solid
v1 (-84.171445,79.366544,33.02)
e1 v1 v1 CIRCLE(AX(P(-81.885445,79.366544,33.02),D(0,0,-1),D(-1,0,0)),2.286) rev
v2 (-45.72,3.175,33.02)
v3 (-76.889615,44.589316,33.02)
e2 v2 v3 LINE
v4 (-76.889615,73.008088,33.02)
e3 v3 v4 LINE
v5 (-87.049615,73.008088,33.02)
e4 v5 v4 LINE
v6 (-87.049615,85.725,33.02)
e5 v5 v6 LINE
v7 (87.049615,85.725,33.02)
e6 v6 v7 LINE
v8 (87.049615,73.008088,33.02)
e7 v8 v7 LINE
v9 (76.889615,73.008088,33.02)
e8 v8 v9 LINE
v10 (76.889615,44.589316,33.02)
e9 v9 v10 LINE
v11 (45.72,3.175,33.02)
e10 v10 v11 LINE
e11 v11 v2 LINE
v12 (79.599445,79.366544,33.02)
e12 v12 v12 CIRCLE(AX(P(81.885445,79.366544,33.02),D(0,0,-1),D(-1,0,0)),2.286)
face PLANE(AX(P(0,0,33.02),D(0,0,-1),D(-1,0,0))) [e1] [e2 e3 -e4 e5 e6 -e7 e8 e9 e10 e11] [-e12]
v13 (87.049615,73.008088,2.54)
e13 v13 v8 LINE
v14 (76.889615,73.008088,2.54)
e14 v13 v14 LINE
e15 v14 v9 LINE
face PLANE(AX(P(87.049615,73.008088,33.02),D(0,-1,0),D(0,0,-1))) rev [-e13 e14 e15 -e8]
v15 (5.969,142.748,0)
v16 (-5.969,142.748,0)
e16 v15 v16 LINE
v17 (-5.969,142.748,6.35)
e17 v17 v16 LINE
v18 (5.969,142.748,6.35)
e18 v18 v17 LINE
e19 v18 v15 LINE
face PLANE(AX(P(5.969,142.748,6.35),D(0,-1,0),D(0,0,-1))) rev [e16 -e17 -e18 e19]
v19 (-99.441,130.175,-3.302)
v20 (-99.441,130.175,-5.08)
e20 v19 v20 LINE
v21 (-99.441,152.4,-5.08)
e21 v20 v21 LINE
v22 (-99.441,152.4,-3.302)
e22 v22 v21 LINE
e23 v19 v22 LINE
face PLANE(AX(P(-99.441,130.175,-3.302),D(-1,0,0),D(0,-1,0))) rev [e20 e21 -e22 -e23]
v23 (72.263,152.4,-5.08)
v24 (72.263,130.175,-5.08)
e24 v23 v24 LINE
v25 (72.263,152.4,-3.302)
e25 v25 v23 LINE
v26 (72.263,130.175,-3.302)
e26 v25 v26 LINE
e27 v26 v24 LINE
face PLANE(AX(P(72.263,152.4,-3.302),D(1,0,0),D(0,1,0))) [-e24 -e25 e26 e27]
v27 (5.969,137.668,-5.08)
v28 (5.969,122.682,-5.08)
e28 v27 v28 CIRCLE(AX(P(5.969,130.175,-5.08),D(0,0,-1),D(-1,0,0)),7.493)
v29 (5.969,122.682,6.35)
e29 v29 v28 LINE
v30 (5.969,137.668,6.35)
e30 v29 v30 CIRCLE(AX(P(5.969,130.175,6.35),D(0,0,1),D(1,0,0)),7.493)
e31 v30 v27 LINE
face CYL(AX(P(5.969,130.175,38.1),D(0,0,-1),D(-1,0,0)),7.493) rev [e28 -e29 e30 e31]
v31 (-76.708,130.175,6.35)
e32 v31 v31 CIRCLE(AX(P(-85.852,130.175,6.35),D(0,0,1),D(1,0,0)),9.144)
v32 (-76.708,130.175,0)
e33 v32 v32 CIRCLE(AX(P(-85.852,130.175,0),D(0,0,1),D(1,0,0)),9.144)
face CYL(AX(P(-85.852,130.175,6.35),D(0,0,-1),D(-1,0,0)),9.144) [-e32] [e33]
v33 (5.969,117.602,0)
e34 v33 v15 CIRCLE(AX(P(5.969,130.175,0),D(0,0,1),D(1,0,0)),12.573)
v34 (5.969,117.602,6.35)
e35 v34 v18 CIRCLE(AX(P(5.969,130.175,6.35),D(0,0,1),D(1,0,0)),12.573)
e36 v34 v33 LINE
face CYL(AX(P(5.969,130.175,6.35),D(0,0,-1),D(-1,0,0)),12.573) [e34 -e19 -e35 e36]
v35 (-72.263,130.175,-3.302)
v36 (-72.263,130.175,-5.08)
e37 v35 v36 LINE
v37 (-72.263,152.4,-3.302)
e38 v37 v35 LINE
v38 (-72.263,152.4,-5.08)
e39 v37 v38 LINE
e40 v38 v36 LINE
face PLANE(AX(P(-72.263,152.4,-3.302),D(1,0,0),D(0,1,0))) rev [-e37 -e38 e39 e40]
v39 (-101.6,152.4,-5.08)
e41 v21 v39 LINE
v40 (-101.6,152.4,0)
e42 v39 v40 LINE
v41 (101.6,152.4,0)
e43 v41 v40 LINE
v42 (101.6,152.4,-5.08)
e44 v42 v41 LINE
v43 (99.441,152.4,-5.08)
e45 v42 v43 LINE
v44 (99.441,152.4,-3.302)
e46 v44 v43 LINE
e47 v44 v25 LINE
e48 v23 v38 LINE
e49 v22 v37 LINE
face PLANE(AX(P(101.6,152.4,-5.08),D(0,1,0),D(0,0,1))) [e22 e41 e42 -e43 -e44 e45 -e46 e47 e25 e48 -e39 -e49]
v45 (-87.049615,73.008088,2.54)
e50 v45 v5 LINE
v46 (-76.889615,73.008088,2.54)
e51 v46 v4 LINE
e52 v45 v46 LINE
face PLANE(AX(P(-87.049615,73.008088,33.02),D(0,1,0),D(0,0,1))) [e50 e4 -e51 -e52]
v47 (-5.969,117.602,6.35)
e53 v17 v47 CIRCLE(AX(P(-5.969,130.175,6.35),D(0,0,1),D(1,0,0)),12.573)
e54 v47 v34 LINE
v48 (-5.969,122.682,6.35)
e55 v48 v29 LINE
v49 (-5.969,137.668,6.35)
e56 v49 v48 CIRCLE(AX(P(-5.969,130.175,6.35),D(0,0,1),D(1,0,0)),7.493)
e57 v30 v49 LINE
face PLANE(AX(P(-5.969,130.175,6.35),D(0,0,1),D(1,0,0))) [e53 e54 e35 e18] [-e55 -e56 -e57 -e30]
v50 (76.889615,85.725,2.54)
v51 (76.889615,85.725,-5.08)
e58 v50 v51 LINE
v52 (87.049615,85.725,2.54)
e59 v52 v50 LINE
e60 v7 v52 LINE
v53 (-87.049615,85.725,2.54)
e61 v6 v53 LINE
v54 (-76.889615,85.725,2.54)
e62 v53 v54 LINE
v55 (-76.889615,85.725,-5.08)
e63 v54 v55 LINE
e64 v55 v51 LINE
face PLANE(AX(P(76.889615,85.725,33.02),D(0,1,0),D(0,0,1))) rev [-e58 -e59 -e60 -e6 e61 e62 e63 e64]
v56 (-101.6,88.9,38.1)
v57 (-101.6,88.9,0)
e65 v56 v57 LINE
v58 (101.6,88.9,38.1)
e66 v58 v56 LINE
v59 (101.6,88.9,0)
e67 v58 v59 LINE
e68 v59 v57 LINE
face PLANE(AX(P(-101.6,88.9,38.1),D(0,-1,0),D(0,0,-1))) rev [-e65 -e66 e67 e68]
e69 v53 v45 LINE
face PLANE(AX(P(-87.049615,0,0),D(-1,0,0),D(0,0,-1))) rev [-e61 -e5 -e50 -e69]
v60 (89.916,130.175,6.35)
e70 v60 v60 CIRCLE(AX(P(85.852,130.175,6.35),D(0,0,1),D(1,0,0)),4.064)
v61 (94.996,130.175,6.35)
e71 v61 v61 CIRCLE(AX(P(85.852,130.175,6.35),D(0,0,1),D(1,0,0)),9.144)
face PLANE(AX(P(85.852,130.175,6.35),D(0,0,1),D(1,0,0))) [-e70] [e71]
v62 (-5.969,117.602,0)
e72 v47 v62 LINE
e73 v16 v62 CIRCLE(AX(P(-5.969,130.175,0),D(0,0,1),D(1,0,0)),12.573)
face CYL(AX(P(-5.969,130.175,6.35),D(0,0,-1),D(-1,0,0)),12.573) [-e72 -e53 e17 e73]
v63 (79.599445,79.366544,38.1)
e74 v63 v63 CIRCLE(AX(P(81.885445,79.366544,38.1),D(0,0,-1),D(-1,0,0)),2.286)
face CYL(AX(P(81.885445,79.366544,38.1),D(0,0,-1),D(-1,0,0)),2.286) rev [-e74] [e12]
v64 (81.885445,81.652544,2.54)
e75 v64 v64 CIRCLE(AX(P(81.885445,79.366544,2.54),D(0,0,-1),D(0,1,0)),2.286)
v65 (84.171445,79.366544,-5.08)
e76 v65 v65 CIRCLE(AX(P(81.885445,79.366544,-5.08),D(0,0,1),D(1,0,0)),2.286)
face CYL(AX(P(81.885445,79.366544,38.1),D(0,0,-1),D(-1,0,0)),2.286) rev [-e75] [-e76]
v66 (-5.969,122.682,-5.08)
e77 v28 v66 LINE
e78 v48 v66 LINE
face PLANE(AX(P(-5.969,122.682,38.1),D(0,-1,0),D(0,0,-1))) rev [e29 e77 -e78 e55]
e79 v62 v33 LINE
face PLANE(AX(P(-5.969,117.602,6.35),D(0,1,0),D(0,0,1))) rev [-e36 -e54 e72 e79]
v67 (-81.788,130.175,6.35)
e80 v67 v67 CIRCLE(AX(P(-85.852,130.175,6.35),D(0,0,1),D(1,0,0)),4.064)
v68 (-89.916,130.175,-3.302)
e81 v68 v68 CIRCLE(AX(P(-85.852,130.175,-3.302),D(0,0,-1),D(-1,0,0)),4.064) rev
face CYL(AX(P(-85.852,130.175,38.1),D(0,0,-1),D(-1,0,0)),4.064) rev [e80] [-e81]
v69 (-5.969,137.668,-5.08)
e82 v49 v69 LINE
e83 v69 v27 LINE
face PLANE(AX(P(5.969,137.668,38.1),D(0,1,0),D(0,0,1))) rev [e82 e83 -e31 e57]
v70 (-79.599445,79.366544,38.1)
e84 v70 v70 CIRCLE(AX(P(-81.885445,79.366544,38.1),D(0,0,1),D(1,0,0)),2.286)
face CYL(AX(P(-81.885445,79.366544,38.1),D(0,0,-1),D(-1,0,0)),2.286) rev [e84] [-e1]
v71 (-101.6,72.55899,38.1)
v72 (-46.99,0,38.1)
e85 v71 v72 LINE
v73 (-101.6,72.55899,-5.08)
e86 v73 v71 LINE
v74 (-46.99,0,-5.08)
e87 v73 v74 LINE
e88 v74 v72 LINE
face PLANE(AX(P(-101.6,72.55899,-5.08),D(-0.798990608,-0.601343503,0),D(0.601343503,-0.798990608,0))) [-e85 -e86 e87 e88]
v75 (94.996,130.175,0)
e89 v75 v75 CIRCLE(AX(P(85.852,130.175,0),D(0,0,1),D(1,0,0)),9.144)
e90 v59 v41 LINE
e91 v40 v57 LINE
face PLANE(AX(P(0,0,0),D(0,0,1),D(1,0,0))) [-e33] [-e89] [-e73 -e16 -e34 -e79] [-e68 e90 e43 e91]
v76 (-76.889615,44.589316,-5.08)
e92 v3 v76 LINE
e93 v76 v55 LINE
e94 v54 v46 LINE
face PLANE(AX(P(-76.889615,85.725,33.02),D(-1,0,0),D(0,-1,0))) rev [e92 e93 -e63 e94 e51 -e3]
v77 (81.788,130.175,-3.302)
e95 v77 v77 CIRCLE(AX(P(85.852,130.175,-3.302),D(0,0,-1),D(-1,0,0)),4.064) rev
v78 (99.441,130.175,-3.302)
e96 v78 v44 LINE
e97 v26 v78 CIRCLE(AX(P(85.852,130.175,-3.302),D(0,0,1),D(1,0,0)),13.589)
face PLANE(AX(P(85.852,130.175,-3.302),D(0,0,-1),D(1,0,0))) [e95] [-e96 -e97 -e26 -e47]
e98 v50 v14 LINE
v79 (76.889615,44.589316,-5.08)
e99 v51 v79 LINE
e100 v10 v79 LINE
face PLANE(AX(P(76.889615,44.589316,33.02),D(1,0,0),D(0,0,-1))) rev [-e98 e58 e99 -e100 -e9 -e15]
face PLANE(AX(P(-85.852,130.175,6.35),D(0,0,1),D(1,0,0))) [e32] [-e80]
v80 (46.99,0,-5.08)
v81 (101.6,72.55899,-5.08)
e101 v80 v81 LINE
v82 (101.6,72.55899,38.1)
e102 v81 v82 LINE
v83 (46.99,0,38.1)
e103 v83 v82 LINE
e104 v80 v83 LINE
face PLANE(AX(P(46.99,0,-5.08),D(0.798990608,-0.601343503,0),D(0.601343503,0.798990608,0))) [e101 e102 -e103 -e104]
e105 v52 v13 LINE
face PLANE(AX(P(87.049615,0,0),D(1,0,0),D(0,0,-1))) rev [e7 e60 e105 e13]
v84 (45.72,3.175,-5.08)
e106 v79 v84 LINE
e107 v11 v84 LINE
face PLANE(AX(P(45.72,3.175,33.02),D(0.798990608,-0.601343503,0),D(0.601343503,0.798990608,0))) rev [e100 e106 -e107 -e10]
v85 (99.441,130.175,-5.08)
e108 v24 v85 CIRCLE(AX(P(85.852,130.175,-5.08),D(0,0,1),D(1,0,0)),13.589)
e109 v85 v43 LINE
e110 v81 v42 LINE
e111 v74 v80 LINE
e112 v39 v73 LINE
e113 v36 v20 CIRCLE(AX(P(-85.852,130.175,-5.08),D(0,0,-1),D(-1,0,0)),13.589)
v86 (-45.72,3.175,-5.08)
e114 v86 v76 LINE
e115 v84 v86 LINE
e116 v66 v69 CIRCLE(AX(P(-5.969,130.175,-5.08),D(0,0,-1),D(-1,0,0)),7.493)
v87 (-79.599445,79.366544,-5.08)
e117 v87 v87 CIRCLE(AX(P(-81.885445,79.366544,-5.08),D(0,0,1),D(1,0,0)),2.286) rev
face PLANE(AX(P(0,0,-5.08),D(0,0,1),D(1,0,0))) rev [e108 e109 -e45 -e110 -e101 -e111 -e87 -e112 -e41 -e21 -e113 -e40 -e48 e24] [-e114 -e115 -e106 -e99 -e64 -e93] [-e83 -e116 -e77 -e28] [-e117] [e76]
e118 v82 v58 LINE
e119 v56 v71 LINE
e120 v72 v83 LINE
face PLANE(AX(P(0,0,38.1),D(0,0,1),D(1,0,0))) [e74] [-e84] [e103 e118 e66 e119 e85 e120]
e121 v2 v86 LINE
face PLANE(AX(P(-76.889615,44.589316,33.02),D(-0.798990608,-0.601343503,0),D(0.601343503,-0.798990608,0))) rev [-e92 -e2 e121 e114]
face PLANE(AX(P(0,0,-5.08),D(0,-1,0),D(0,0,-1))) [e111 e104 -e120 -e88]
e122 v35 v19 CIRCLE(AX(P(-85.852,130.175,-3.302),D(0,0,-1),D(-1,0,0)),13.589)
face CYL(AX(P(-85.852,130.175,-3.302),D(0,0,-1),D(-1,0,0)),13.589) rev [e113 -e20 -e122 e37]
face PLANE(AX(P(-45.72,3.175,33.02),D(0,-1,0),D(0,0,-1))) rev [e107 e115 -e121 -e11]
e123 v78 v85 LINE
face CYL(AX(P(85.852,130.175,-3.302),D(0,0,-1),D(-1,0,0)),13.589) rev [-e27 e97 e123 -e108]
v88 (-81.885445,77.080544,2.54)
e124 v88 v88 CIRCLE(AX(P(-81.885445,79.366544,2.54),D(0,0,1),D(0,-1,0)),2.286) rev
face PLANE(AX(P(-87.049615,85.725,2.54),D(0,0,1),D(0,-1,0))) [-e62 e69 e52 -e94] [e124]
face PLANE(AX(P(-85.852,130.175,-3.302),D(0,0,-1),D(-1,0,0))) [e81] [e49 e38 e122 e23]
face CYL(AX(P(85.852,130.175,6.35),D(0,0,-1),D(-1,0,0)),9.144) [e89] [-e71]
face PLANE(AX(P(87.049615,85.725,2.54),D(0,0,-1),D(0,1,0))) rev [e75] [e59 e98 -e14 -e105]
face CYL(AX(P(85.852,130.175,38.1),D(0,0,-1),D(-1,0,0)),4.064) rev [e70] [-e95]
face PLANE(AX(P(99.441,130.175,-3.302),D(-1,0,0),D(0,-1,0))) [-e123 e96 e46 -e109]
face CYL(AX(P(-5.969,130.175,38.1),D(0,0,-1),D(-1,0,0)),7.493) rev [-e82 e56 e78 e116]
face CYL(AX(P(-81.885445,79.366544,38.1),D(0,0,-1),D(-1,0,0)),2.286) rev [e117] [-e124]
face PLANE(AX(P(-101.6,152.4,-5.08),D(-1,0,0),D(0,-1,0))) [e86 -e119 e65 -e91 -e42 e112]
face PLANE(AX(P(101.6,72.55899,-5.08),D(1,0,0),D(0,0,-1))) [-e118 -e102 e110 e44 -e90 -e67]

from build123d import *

# Parameters (mm, degrees)
BASE_FLANGE1_DEPTH           = 5.08
OG_POCKET_DEPTH              = 38.1
SHELL_OF_POCKET_DEPTH        = 38.1
BATTERY_TAIL_HOLE_DEPTH      = 189.182975851
BATTERY_TAIL_HOLE_DEPTH_BACK = 189.182975851
SKETCH11_R                   = 4.064
TAB_BOLT_HOLES_DEPTH         = 189.182975851
SKETCH12_W                   = 30.48
SKETCH12_H                   = 12.716912384
WEIGHT_SAVER_DEPTH           = 10.16
SKETCH13_R                   = 2.286
BOLT_HOLES_THROUGH_DEPTH     = 189.182975851
CUT_EXTRUDE6_DEPTH           = 1.778
POSSIBLE_LIP_R               = 9.144
POSSIBLE_LIP_R_2             = 4.064
BATTERY_LIP_DEPTH            = 6.35


# Sheet-metal steps are written as plain solids
with BuildPart() as part:
    # Sketch1 → Base-Flange1 (new body)
    with BuildSketch(Plane.XY):
        Polygon((0, 0), (46.99, 0), (101.6, 72.558989745), (101.6, 152.4), (-101.6, 152.4), (-101.6, 72.558989745), (-46.99, 0), align=None)
    extrude(amount=-BASE_FLANGE1_DEPTH)

    # Sketch6 → OG Pocket (add)
    with BuildSketch(Plane.XY):
        Polygon((-101.6, 72.558989745), (-101.6, 88.9), (101.6, 88.9), (101.6, 72.558989745), (46.99, 0), (-46.99, 0), align=None)
    extrude(amount=OG_POCKET_DEPTH)

    # Sketch9 → Shell of Pocket (cut)
    with BuildSketch(Plane(origin=(0, 0, -5.08), x_dir=(-1, 0, 0), z_dir=(0, 0, -1))):
        Polygon((-76.889615099, 44.589315736), (-76.889615099, 85.725), (76.889615099, 85.725), (76.889615099, 44.589315736), (45.72, 3.175), (-45.72, 3.175), align=None)
    extrude(amount=-SHELL_OF_POCKET_DEPTH, mode=Mode.SUBTRACT)

    # Sketch10 → Battery Tail Hole (cut, two sides: drawn at the far end of the back side and taken through both)
    with BuildSketch(Plane(origin=(0, 0, -5.08), x_dir=(-1, 0, 0), z_dir=(0, 0, -1)).offset(-BATTERY_TAIL_HOLE_DEPTH_BACK)):
        with BuildLine():
            Line((-5.969, 137.668), (5.969, 137.668))
            ThreePointArc((5.969, 137.668), (13.462, 130.175), (5.969, 122.682))
            Line((5.969, 122.682), (-5.969, 122.682))
            ThreePointArc((-5.969, 122.682), (-13.462, 130.175), (-5.969, 137.668))
        make_face()
    extrude(amount=BATTERY_TAIL_HOLE_DEPTH + BATTERY_TAIL_HOLE_DEPTH_BACK, mode=Mode.SUBTRACT)

    # Sketch11 → Tab Bolt Holes (cut, through all)
    with BuildSketch(Plane(origin=(0, 0, -5.08), x_dir=(-1, 0, 0), z_dir=(0, 0, -1))):
        with Locations((-85.852, 130.175)):
            Circle(SKETCH11_R)
        with Locations((85.852, 130.175)):
            Circle(SKETCH11_R)
    extrude(amount=-TAB_BOLT_HOLES_DEPTH, mode=Mode.SUBTRACT)

    # Sketch12 → Weight Saver (cut)
    with BuildSketch(Plane.ZY.offset(-76.889615099)):
        with Locations((17.78, 79.366543808)):
            Rectangle(SKETCH12_W, SKETCH12_H)
    weight_saver = extrude(amount=-WEIGHT_SAVER_DEPTH, mode=Mode.SUBTRACT)

    # Mirror1: Weight Saver across plane
    add(weight_saver.mirror(Plane(origin=(0, 0, 0), x_dir=(0, 0, 1), z_dir=(1, 0, 0))), mode=Mode.SUBTRACT)

    # Sketch13 → Bolt holes- Through (cut, symmetric)
    with BuildSketch(Plane(origin=(0, 0, -5.08), x_dir=(-1, 0, 0), z_dir=(0, 0, -1))):
        with Locations(Location((-81.885444711, 79.366543808, 0), (0, 0, 90))):
            Circle(SKETCH13_R)
    bolt_holes_through = extrude(amount=BOLT_HOLES_THROUGH_DEPTH, both=True, mode=Mode.SUBTRACT)

    # Mirror2: Bolt holes- Through across plane
    add(bolt_holes_through.mirror(Plane(origin=(0, 0, 0), x_dir=(0, 0, 1), z_dir=(1, 0, 0))), mode=Mode.SUBTRACT)

    # Sketch14 → Cut-Extrude6 (cut)
    with BuildSketch(Plane(origin=(0, 0, -5.08), x_dir=(-1, 0, 0), z_dir=(0, 0, -1))):
        with BuildLine():
            Line((72.263, 152.4), (72.263, 130.175))
            ThreePointArc((72.263, 130.175), (85.852, 116.586), (99.441, 130.175))
            Line((99.441, 130.175), (99.441, 152.4))
            Line((99.441, 152.4), (72.263, 152.4))
        make_face()
    cut_extrude6 = extrude(amount=-CUT_EXTRUDE6_DEPTH, mode=Mode.SUBTRACT)

    # Mirror3: Cut-Extrude6 across plane
    add(cut_extrude6.mirror(Plane(origin=(0, 0, 0), x_dir=(0, 0, 1), z_dir=(1, 0, 0))), mode=Mode.SUBTRACT)

    # Possible Lip → Battery Lip (add)
    # profile 1 of 3: a face of its own
    with BuildSketch(Plane.XY):
        with Locations((85.852, 130.175)):
            Circle(POSSIBLE_LIP_R)
        with Locations(Location((85.852, 130.175, 0), (0, 0, 180))):
            Circle(POSSIBLE_LIP_R_2, mode=Mode.SUBTRACT)
    # profile 2 of 3: a face of its own
    with BuildSketch(Plane.XY):
        with Locations((-85.852, 130.175)):
            Circle(POSSIBLE_LIP_R)
        with Locations(Location((-85.852, 130.175, 0), (0, 0, 180))):
            Circle(POSSIBLE_LIP_R_2, mode=Mode.SUBTRACT)
    # profile 3 of 3: a face of its own
    with BuildSketch(Plane.XY):
        with BuildLine():
            Line((-5.969, 117.602), (5.969, 117.602))
            ThreePointArc((5.969, 117.602), (18.542, 130.175), (5.969, 142.748))
            Line((5.969, 142.748), (-5.969, 142.748))
            ThreePointArc((-5.969, 142.748), (-18.542, 130.175), (-5.969, 117.602))
        make_face()
        with BuildLine():
            Line((-5.969, 122.682), (5.969, 122.682))
            ThreePointArc((5.969, 122.682), (13.462, 130.175), (5.969, 137.668))
            Line((5.969, 137.668), (-5.969, 137.668))
            ThreePointArc((-5.969, 137.668), (-13.462, 130.175), (-5.969, 122.682))
        make_face(mode=Mode.SUBTRACT)
    extrude(amount=BATTERY_LIP_DEPTH)


solid = part.part
